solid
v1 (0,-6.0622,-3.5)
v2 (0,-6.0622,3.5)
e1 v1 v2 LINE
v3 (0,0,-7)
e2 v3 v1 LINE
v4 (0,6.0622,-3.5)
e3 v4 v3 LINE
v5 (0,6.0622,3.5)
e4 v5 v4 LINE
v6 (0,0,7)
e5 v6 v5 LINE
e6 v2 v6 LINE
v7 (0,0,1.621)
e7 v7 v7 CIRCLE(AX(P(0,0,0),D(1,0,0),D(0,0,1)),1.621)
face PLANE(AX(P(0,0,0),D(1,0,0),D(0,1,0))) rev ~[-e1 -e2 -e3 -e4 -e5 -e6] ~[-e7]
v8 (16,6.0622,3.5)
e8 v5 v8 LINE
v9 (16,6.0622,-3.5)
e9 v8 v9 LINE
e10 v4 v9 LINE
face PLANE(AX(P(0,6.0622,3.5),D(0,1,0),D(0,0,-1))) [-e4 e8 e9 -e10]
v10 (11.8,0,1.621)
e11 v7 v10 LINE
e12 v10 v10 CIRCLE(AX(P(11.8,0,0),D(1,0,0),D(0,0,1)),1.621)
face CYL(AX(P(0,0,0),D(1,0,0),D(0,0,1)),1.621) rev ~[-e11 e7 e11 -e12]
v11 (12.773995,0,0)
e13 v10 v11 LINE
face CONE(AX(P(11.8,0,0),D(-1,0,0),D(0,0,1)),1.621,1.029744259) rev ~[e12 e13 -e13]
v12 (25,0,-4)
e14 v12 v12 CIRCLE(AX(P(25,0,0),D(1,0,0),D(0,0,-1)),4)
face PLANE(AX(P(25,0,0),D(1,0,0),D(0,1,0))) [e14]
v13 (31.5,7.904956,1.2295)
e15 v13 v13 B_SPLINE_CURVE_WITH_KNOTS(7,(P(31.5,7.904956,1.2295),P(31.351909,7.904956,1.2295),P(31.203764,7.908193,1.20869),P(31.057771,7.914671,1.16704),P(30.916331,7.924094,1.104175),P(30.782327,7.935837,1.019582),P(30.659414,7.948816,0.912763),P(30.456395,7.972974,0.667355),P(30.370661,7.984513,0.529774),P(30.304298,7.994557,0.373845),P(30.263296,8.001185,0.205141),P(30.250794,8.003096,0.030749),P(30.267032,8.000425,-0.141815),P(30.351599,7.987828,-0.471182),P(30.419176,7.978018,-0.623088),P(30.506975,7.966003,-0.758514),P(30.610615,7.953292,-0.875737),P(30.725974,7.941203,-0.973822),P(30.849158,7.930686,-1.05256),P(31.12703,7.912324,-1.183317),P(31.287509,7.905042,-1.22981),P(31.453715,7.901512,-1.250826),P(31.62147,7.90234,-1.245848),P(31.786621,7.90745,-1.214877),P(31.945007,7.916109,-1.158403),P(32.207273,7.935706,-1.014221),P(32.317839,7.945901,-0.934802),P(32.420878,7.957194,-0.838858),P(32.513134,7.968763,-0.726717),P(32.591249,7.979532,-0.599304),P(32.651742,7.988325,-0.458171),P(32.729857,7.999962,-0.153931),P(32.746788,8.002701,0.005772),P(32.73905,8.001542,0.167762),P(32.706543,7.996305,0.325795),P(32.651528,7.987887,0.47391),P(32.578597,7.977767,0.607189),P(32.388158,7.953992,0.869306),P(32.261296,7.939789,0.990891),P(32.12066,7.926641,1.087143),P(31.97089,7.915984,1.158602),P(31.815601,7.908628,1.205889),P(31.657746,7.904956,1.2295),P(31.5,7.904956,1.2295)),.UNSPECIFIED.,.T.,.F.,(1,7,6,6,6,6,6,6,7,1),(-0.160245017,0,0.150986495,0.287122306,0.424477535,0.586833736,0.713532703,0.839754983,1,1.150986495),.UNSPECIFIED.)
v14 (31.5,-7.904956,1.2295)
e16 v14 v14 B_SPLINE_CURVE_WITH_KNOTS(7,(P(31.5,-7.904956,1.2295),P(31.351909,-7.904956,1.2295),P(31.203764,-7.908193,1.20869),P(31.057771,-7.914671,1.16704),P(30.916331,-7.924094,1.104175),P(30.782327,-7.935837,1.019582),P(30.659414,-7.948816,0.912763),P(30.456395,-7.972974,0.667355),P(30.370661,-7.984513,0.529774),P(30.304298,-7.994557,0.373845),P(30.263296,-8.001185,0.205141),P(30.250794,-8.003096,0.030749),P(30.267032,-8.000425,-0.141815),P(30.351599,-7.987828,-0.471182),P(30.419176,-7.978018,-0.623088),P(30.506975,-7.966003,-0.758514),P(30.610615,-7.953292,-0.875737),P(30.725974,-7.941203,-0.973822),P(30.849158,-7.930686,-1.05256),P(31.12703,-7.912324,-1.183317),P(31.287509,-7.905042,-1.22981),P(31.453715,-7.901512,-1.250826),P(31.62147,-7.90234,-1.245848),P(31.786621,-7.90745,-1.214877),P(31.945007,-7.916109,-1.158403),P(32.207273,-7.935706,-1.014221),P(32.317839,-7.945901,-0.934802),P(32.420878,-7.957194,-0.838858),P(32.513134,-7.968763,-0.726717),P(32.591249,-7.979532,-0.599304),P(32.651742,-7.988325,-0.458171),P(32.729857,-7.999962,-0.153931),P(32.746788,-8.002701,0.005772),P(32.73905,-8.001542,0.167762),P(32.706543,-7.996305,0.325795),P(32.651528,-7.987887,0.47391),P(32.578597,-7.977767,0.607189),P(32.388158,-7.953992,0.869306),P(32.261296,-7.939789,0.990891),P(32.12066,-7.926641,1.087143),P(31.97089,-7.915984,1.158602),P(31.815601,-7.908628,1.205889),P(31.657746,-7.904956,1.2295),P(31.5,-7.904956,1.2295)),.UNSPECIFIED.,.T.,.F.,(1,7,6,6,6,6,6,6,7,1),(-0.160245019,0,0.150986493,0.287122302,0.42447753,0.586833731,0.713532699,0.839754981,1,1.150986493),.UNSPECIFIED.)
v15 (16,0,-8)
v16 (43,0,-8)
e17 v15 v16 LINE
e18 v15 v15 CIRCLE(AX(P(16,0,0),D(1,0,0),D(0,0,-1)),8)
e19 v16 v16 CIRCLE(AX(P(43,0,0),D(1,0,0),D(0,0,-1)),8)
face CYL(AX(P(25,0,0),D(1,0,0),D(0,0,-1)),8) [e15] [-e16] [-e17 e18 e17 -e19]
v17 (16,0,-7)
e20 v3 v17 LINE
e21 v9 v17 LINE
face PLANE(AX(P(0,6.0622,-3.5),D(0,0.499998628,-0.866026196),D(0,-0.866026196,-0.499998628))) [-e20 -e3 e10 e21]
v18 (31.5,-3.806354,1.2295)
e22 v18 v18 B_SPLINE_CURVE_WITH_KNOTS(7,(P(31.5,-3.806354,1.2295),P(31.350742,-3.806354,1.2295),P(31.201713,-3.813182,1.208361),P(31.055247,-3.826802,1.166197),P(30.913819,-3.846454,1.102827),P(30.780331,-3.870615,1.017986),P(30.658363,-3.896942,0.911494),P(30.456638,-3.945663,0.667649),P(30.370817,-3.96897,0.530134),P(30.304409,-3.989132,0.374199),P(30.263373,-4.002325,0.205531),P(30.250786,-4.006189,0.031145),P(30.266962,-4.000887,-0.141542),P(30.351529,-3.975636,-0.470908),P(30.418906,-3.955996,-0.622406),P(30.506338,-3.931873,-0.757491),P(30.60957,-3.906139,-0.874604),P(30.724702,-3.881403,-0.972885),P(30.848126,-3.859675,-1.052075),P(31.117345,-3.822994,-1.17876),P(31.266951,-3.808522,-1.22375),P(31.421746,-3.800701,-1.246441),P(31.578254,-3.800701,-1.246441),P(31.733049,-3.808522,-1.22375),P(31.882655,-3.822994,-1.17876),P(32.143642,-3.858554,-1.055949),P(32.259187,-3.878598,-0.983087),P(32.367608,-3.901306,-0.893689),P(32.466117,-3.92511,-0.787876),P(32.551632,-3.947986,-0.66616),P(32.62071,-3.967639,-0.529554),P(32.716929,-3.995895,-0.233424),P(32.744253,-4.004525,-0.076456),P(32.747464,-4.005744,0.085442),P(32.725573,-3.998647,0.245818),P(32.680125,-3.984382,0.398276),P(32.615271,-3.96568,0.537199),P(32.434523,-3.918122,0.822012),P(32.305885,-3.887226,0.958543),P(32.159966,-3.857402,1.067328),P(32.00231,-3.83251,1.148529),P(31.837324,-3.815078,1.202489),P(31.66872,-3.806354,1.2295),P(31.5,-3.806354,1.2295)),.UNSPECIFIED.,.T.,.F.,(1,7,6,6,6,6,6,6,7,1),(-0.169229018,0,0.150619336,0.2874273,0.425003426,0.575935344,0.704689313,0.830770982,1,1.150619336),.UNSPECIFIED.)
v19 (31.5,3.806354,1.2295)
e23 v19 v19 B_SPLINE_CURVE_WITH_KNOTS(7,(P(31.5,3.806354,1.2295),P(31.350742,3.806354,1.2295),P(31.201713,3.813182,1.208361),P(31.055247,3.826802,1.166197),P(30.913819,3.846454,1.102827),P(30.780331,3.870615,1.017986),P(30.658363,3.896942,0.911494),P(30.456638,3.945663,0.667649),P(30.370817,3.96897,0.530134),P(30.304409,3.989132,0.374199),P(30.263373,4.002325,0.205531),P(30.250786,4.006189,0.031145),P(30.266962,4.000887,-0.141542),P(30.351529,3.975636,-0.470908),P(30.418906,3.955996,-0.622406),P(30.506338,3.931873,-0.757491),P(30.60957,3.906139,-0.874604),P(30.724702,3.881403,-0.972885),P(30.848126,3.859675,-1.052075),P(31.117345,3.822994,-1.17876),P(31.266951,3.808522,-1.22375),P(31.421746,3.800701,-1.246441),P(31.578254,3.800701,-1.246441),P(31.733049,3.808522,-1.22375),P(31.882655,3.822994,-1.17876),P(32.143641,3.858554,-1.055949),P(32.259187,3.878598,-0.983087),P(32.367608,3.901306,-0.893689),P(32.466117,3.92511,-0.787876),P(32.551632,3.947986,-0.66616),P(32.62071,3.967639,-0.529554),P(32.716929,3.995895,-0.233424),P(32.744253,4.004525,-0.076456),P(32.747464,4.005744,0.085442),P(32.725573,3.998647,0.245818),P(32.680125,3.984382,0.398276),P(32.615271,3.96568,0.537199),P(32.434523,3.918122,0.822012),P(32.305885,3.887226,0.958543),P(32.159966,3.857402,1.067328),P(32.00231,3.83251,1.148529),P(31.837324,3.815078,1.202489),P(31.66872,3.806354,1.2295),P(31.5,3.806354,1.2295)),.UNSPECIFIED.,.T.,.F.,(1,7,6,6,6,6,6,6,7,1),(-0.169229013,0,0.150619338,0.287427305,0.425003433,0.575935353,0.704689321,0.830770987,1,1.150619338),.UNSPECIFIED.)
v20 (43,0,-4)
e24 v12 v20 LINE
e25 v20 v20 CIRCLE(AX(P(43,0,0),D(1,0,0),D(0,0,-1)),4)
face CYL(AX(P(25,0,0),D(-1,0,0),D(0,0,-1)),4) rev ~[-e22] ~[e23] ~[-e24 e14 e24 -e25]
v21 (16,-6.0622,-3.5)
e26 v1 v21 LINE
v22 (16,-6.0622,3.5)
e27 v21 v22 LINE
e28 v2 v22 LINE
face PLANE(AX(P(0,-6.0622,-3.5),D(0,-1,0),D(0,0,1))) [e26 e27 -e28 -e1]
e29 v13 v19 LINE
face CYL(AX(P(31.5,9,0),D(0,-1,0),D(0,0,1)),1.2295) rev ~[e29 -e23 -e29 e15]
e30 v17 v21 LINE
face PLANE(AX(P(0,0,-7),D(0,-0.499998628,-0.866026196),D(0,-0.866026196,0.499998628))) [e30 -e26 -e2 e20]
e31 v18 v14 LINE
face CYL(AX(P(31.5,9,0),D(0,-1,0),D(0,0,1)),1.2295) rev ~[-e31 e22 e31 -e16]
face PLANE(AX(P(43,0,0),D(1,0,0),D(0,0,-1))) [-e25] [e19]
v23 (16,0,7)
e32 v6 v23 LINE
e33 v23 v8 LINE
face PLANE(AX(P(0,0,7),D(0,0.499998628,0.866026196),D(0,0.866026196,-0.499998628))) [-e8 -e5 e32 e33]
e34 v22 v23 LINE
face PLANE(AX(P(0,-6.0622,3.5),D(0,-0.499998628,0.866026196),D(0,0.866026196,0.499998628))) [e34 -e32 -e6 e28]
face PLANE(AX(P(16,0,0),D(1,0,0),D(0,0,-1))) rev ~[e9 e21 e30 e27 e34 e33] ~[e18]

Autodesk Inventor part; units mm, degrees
ref_plane "YZ Plane" through (0, 0, 0) normal (1, 0, 0) x (0, 1, 0)
ref_plane "XY Plane" through (0, 0, 0) normal (0, 0, 1) x (1, 0, 0)
sketch "Эскиз1" plane through (0, 0, 0) normal (1, 0, 0) x (0, 1, 0)
  line L0 (6.0622, 3.5) -> (6.0622, -3.5)
  line L1 (6.0622, -3.5) -> (0, -7)
  line L2 (0, -7) -> (-6.0622, -3.5)
  line L3 (-6.0622, -3.5) -> (-6.0622, 3.5)
  line L4 (-6.0622, 3.5) -> (0, 7)
  line L5 (0, 7) -> (6.0622, 3.5)
  circle A0 centre (0, 0) radius 7 construction
  dimension "d0" = 14
extrude "Выдавливание1" add sketch "Эскиз1" along normal blind 25
sketch "Эскиз2" plane through (25, 0, 0) normal (1, 0, 0) x (0, 0, -1)
  circle A0 centre (0, 0) radius 8
  circle A1 centre (0, 0) radius 4
  dimension "d3" = 16
  dimension "d6" = 8
extrude "Выдавливание2" add sketch "Эскиз2" along normal blind 18 and the other way blind 9
ref_plane "РабПлоскость1" through (0, 9, 0) normal (0, 1, 0) x (-1, 0, 0)
sketch "Эскиз3" plane through (0, 9, 0) normal (0, 1, 0) x (-1, 0, 0)
  line L0 (-43, 8) -> (-43, -8) projected
  point P0 (0, 0)
  point P1 (-31.5, 0)
  dimension "d16" = 11.5
hole "Отверстие1" at (31.5, 9, 0) direction (0, -1, 0) diameter 2.459 end through all thread size "M3x0.5" class "6H" standard "ISO Metric profile"
sketch "Эскиз4" plane through (0, 0, 0) normal (-1, 0, 0) x (0, 0, 1)
  point P0 (0, 0)
  point P1 (0, 0)
hole "Отверстие2" at (0, 0, 0) direction (1, 0, 0) diameter 3.242 depth 11.8 tip angle 118 thread size "M4x0.7" class "6H" standard "ISO Metric profile"
properties part number "переходная втулка"
